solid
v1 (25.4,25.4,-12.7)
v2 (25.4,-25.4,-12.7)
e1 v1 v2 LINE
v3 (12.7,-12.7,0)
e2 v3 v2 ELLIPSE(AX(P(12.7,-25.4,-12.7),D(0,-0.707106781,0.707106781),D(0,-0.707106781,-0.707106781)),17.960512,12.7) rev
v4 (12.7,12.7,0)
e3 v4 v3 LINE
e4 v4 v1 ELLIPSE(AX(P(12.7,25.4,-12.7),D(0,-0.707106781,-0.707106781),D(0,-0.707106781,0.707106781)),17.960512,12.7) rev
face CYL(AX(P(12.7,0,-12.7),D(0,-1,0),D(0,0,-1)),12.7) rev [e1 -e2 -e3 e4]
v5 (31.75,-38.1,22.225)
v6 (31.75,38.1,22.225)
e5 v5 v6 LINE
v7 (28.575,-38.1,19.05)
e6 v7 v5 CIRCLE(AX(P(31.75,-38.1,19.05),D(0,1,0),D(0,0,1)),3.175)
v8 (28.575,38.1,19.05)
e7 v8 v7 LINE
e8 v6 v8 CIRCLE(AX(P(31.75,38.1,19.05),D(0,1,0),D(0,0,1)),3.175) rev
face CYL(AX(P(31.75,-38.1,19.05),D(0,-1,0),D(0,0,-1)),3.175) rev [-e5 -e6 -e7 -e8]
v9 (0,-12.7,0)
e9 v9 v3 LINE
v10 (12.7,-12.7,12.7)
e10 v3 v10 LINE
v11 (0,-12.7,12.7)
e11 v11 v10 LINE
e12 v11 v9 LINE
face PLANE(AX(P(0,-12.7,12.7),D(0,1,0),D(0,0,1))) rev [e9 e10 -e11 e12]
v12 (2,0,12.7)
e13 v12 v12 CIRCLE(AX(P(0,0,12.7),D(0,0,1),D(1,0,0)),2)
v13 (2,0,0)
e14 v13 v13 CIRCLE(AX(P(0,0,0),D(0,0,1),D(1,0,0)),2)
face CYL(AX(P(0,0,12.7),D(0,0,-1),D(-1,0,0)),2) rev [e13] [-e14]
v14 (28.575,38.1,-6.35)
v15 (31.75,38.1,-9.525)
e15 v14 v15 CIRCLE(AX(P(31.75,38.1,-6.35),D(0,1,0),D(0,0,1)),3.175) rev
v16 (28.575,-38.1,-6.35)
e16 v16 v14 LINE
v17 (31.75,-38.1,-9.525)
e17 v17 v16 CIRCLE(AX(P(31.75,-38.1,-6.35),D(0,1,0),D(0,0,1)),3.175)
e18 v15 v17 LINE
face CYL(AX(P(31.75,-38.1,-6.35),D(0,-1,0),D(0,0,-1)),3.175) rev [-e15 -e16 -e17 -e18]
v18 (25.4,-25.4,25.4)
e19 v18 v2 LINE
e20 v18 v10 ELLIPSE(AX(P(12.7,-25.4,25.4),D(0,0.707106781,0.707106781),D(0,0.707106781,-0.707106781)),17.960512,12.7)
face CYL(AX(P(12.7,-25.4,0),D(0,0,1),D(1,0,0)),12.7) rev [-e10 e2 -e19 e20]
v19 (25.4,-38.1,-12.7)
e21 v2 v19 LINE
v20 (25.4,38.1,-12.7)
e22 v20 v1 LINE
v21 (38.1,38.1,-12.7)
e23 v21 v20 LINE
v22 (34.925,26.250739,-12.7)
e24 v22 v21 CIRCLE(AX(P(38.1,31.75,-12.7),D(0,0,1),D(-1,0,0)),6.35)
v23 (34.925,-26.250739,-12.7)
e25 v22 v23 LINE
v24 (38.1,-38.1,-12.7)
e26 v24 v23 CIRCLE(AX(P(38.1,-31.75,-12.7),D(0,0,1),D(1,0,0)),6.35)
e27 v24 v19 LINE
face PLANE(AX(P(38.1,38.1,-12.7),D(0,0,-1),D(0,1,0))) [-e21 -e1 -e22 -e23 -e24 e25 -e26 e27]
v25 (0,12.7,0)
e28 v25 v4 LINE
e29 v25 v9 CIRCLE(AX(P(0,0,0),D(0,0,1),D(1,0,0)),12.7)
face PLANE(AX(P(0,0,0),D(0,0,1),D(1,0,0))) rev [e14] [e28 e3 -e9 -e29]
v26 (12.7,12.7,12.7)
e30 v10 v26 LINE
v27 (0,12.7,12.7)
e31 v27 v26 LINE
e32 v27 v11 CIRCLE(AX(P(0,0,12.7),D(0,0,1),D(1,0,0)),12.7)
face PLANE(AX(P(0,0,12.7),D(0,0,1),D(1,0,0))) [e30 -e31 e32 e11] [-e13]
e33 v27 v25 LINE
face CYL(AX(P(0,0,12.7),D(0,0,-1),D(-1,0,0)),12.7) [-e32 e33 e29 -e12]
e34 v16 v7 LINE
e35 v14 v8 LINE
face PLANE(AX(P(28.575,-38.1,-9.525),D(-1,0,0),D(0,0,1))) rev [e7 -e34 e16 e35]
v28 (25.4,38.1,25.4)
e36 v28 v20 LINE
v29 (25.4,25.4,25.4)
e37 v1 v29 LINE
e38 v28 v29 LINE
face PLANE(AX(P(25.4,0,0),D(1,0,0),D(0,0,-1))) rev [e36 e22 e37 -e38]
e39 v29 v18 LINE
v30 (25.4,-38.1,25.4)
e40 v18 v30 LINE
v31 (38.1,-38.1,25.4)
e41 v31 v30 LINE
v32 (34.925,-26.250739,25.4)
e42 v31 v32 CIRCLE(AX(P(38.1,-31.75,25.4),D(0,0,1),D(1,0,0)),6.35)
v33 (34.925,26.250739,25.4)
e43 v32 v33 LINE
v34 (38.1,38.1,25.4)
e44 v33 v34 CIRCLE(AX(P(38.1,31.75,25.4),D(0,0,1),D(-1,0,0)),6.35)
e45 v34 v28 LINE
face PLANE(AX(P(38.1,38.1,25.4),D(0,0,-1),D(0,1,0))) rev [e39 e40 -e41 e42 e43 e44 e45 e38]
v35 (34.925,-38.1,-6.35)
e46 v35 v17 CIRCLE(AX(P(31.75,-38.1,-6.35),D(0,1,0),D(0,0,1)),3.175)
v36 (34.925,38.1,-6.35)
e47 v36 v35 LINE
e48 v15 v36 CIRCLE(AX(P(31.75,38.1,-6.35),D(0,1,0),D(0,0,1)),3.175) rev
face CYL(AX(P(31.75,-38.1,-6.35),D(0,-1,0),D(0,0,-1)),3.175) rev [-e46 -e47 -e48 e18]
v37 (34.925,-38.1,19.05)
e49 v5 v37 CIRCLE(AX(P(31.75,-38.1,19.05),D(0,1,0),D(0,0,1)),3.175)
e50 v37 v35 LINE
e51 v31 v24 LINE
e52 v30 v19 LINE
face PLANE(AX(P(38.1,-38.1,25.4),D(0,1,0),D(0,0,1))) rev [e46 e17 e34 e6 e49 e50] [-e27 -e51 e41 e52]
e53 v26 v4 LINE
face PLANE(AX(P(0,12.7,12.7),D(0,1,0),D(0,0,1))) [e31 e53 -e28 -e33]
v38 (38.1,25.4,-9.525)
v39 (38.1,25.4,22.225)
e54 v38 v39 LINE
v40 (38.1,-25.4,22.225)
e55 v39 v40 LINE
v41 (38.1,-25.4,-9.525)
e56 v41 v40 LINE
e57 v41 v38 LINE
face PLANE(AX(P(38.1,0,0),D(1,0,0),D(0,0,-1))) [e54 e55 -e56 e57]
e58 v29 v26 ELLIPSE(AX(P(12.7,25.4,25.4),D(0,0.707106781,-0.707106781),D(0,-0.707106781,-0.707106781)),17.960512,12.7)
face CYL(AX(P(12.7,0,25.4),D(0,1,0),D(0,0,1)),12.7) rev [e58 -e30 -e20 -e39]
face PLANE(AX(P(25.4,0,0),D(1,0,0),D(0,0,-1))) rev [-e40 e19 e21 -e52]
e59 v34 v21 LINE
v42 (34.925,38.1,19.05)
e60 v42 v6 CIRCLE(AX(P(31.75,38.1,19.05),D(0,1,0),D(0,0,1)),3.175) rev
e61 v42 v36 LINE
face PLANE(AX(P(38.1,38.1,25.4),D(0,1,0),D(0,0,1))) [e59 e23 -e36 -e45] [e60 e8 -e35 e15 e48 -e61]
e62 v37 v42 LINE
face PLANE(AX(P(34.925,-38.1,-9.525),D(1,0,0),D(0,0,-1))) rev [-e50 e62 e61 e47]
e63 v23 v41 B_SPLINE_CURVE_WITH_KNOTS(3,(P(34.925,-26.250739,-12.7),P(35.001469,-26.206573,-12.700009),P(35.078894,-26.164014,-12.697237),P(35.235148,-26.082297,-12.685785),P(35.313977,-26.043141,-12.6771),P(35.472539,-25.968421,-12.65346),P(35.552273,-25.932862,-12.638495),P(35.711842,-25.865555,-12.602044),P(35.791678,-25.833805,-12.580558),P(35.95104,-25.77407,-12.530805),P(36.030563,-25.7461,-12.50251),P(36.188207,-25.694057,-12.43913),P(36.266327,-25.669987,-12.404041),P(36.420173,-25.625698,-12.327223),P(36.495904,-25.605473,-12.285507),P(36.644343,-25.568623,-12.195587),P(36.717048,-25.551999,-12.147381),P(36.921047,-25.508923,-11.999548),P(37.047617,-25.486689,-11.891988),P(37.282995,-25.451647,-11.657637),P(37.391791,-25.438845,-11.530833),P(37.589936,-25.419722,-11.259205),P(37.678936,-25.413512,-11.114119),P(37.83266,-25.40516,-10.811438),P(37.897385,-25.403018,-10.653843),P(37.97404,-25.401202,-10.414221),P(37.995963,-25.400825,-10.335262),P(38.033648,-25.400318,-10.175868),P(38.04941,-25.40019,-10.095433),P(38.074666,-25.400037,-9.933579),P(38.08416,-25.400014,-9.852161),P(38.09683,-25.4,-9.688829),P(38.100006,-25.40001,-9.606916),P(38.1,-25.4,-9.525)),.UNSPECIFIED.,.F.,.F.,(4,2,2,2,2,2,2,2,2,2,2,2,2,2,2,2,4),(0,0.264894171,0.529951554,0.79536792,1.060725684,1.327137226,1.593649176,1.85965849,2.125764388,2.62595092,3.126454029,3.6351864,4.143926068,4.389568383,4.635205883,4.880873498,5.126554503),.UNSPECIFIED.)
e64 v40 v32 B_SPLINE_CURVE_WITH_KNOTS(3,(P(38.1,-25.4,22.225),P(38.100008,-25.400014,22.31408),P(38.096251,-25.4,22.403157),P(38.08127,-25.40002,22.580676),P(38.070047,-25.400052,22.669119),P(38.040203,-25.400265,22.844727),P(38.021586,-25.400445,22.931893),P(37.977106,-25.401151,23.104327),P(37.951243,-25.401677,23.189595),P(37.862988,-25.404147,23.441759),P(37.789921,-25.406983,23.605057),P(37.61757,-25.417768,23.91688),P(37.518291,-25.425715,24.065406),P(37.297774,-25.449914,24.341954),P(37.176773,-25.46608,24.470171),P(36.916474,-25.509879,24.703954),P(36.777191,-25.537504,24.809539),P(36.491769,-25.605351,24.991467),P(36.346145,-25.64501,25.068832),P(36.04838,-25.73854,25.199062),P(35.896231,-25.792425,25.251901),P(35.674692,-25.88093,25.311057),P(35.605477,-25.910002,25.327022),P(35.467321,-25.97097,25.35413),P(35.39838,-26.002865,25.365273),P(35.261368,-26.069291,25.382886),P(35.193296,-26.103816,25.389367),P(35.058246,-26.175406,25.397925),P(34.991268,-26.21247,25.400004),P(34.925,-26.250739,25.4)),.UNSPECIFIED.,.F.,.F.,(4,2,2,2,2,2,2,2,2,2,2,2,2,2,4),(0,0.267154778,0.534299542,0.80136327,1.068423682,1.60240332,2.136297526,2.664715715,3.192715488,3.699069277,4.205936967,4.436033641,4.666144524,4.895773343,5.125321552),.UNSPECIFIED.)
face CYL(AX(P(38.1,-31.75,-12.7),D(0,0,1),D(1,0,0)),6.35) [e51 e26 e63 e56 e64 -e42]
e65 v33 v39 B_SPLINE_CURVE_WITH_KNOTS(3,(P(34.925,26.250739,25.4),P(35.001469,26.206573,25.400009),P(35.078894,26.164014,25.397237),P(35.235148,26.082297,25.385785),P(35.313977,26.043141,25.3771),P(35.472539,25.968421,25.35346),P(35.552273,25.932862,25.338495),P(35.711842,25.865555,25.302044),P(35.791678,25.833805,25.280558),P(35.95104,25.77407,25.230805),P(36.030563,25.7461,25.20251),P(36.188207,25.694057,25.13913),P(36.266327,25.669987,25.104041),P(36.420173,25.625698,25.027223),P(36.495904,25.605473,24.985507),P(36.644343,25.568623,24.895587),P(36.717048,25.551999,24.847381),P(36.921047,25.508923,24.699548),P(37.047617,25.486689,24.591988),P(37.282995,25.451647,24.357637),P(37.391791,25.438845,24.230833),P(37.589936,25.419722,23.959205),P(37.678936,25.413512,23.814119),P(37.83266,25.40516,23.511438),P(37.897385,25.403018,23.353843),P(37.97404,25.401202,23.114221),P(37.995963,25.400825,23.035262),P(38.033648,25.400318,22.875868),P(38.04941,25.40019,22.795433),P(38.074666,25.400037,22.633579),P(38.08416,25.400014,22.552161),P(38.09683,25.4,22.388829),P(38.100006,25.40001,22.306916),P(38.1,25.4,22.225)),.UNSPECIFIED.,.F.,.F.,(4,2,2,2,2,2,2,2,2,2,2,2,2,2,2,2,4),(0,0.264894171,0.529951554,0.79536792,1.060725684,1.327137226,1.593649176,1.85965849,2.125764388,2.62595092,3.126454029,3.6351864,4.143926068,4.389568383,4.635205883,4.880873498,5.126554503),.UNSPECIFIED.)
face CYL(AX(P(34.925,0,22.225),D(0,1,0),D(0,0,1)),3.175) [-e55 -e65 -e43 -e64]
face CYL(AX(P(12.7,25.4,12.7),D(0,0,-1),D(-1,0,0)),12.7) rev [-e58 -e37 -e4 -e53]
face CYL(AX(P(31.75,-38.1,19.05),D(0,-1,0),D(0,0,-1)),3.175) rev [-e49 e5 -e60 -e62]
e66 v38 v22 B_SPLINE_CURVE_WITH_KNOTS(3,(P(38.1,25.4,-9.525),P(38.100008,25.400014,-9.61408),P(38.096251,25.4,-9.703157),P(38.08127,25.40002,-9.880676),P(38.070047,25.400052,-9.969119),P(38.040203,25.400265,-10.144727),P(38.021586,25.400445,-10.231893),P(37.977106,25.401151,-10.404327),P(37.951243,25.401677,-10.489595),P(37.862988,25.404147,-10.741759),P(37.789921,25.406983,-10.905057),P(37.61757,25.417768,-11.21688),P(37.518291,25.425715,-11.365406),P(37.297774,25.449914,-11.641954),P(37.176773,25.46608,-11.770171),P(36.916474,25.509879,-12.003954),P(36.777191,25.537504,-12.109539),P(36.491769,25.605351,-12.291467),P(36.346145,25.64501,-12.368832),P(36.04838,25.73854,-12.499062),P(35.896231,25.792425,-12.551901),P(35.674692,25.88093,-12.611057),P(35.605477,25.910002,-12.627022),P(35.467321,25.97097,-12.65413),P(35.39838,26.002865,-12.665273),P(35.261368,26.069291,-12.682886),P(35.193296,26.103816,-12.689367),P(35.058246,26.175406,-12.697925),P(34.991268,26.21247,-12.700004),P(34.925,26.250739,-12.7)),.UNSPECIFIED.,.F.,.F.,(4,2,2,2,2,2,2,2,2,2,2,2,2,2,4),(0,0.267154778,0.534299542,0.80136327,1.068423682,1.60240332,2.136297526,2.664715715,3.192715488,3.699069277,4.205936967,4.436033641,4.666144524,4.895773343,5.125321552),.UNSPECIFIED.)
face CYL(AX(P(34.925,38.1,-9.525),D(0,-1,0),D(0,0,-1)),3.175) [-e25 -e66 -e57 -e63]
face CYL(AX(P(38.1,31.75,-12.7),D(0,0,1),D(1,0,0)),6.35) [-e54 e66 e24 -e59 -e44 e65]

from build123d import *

# Parameters (mm, degrees)
SKETCH1_R           = 12.7
SKETCH1_R_2         = 2
BOSS_EXTRUDE1_DEPTH = 12.7
SKETCH2_W           = 38.1
SKETCH2_H           = 76.2
BOSS_EXTRUDE2_DEPTH = 12.7
FILLET1_R           = 12.7
SKETCH3_W           = 6.35
SKETCH3_H           = 31.75
CUT_EXTRUDE1_DEPTH  = 89.9
BOSS_EXTRUDE3_DEPTH = 38.1
FILLET2_R           = 3.175


with BuildPart() as part:
    # Sketch1 → Boss-Extrude1 (new body)
    # profile 1 of 2: a face of its own
    with BuildSketch(Plane.XY):
        Circle(SKETCH1_R)
        Circle(SKETCH1_R_2, mode=Mode.SUBTRACT)
    # profile 2 of 2: a face of its own
    with BuildSketch(Plane.XY):
        with BuildLine():
            ThreePointArc((12.7, 0), (8.980256121, -8.980256121), (0, -12.7))
            Line((0, -12.7), (25.4, -12.7))
            Line((25.4, -12.7), (25.4, 12.7))
            Line((25.4, 12.7), (0, 12.7))
            ThreePointArc((0, 12.7), (8.980256121, 8.980256121), (12.7, 0))
        make_face()
    extrude(amount=BOSS_EXTRUDE1_DEPTH)

    # Sketch2 → Boss-Extrude2 (add)
    with BuildSketch(Plane(origin=(25.4, 0, 0), x_dir=(0, 0, -1), z_dir=(1, 0, 0))):
        with Locations((-6.35, 0)):
            Rectangle(SKETCH2_W, SKETCH2_H)
    extrude(amount=BOSS_EXTRUDE2_DEPTH)

    # Fillet1
    fillet1_edges = [part.edges().sort_by_distance(p)[0] for p in [
        (25.4, 12.7, 6.35),
        (25.4, -12.7, 6.35),
        (25.4, 0, 12.7),
        (25.4, 0, 0),
    ]]
    fillet(fillet1_edges, radius=FILLET1_R - 0.0001)  # a hair under: the kernel refuses the full size

    # Sketch3 → Cut-Extrude1 (cut, through all)
    with BuildSketch(Plane(origin=(0, 38.1, 0), x_dir=(1, 0, 0), z_dir=(0, 1, 0))):
        with Locations((31.75, -6.35)):
            Rectangle(SKETCH3_W, SKETCH3_H)
    extrude(amount=-CUT_EXTRUDE1_DEPTH, mode=Mode.SUBTRACT)

    # Sketch4 → Boss-Extrude3 (add)
    with BuildSketch(Plane.XY.offset(25.4)):
        with BuildLine():
            Line((38.1, 38.1), (38.1, 25.4))
            ThreePointArc((38.1, 25.4), (44.45, 31.75), (38.1, 38.1))
        make_face()
        with BuildLine():
            Line((38.1, -25.4), (38.1, -38.1))
            ThreePointArc((38.1, -38.1), (44.45, -31.75), (38.1, -25.4))
        make_face()
    extrude(amount=-BOSS_EXTRUDE3_DEPTH)

    # Fillet2
    fillet2_edges = [part.edges().sort_by_distance(p)[0] for p in [
        (34.925, 0, 22.225),
        (28.575, 0, 22.225),
        (34.925, 0, -9.525),
        (28.575, 0, -9.525),
        (38.1, 0, 25.4),
        (38.1, 0, -12.7),
    ]]
    fillet(fillet2_edges, radius=FILLET2_R - 0.0001)  # a hair under: the kernel refuses the full size


solid = part.part
